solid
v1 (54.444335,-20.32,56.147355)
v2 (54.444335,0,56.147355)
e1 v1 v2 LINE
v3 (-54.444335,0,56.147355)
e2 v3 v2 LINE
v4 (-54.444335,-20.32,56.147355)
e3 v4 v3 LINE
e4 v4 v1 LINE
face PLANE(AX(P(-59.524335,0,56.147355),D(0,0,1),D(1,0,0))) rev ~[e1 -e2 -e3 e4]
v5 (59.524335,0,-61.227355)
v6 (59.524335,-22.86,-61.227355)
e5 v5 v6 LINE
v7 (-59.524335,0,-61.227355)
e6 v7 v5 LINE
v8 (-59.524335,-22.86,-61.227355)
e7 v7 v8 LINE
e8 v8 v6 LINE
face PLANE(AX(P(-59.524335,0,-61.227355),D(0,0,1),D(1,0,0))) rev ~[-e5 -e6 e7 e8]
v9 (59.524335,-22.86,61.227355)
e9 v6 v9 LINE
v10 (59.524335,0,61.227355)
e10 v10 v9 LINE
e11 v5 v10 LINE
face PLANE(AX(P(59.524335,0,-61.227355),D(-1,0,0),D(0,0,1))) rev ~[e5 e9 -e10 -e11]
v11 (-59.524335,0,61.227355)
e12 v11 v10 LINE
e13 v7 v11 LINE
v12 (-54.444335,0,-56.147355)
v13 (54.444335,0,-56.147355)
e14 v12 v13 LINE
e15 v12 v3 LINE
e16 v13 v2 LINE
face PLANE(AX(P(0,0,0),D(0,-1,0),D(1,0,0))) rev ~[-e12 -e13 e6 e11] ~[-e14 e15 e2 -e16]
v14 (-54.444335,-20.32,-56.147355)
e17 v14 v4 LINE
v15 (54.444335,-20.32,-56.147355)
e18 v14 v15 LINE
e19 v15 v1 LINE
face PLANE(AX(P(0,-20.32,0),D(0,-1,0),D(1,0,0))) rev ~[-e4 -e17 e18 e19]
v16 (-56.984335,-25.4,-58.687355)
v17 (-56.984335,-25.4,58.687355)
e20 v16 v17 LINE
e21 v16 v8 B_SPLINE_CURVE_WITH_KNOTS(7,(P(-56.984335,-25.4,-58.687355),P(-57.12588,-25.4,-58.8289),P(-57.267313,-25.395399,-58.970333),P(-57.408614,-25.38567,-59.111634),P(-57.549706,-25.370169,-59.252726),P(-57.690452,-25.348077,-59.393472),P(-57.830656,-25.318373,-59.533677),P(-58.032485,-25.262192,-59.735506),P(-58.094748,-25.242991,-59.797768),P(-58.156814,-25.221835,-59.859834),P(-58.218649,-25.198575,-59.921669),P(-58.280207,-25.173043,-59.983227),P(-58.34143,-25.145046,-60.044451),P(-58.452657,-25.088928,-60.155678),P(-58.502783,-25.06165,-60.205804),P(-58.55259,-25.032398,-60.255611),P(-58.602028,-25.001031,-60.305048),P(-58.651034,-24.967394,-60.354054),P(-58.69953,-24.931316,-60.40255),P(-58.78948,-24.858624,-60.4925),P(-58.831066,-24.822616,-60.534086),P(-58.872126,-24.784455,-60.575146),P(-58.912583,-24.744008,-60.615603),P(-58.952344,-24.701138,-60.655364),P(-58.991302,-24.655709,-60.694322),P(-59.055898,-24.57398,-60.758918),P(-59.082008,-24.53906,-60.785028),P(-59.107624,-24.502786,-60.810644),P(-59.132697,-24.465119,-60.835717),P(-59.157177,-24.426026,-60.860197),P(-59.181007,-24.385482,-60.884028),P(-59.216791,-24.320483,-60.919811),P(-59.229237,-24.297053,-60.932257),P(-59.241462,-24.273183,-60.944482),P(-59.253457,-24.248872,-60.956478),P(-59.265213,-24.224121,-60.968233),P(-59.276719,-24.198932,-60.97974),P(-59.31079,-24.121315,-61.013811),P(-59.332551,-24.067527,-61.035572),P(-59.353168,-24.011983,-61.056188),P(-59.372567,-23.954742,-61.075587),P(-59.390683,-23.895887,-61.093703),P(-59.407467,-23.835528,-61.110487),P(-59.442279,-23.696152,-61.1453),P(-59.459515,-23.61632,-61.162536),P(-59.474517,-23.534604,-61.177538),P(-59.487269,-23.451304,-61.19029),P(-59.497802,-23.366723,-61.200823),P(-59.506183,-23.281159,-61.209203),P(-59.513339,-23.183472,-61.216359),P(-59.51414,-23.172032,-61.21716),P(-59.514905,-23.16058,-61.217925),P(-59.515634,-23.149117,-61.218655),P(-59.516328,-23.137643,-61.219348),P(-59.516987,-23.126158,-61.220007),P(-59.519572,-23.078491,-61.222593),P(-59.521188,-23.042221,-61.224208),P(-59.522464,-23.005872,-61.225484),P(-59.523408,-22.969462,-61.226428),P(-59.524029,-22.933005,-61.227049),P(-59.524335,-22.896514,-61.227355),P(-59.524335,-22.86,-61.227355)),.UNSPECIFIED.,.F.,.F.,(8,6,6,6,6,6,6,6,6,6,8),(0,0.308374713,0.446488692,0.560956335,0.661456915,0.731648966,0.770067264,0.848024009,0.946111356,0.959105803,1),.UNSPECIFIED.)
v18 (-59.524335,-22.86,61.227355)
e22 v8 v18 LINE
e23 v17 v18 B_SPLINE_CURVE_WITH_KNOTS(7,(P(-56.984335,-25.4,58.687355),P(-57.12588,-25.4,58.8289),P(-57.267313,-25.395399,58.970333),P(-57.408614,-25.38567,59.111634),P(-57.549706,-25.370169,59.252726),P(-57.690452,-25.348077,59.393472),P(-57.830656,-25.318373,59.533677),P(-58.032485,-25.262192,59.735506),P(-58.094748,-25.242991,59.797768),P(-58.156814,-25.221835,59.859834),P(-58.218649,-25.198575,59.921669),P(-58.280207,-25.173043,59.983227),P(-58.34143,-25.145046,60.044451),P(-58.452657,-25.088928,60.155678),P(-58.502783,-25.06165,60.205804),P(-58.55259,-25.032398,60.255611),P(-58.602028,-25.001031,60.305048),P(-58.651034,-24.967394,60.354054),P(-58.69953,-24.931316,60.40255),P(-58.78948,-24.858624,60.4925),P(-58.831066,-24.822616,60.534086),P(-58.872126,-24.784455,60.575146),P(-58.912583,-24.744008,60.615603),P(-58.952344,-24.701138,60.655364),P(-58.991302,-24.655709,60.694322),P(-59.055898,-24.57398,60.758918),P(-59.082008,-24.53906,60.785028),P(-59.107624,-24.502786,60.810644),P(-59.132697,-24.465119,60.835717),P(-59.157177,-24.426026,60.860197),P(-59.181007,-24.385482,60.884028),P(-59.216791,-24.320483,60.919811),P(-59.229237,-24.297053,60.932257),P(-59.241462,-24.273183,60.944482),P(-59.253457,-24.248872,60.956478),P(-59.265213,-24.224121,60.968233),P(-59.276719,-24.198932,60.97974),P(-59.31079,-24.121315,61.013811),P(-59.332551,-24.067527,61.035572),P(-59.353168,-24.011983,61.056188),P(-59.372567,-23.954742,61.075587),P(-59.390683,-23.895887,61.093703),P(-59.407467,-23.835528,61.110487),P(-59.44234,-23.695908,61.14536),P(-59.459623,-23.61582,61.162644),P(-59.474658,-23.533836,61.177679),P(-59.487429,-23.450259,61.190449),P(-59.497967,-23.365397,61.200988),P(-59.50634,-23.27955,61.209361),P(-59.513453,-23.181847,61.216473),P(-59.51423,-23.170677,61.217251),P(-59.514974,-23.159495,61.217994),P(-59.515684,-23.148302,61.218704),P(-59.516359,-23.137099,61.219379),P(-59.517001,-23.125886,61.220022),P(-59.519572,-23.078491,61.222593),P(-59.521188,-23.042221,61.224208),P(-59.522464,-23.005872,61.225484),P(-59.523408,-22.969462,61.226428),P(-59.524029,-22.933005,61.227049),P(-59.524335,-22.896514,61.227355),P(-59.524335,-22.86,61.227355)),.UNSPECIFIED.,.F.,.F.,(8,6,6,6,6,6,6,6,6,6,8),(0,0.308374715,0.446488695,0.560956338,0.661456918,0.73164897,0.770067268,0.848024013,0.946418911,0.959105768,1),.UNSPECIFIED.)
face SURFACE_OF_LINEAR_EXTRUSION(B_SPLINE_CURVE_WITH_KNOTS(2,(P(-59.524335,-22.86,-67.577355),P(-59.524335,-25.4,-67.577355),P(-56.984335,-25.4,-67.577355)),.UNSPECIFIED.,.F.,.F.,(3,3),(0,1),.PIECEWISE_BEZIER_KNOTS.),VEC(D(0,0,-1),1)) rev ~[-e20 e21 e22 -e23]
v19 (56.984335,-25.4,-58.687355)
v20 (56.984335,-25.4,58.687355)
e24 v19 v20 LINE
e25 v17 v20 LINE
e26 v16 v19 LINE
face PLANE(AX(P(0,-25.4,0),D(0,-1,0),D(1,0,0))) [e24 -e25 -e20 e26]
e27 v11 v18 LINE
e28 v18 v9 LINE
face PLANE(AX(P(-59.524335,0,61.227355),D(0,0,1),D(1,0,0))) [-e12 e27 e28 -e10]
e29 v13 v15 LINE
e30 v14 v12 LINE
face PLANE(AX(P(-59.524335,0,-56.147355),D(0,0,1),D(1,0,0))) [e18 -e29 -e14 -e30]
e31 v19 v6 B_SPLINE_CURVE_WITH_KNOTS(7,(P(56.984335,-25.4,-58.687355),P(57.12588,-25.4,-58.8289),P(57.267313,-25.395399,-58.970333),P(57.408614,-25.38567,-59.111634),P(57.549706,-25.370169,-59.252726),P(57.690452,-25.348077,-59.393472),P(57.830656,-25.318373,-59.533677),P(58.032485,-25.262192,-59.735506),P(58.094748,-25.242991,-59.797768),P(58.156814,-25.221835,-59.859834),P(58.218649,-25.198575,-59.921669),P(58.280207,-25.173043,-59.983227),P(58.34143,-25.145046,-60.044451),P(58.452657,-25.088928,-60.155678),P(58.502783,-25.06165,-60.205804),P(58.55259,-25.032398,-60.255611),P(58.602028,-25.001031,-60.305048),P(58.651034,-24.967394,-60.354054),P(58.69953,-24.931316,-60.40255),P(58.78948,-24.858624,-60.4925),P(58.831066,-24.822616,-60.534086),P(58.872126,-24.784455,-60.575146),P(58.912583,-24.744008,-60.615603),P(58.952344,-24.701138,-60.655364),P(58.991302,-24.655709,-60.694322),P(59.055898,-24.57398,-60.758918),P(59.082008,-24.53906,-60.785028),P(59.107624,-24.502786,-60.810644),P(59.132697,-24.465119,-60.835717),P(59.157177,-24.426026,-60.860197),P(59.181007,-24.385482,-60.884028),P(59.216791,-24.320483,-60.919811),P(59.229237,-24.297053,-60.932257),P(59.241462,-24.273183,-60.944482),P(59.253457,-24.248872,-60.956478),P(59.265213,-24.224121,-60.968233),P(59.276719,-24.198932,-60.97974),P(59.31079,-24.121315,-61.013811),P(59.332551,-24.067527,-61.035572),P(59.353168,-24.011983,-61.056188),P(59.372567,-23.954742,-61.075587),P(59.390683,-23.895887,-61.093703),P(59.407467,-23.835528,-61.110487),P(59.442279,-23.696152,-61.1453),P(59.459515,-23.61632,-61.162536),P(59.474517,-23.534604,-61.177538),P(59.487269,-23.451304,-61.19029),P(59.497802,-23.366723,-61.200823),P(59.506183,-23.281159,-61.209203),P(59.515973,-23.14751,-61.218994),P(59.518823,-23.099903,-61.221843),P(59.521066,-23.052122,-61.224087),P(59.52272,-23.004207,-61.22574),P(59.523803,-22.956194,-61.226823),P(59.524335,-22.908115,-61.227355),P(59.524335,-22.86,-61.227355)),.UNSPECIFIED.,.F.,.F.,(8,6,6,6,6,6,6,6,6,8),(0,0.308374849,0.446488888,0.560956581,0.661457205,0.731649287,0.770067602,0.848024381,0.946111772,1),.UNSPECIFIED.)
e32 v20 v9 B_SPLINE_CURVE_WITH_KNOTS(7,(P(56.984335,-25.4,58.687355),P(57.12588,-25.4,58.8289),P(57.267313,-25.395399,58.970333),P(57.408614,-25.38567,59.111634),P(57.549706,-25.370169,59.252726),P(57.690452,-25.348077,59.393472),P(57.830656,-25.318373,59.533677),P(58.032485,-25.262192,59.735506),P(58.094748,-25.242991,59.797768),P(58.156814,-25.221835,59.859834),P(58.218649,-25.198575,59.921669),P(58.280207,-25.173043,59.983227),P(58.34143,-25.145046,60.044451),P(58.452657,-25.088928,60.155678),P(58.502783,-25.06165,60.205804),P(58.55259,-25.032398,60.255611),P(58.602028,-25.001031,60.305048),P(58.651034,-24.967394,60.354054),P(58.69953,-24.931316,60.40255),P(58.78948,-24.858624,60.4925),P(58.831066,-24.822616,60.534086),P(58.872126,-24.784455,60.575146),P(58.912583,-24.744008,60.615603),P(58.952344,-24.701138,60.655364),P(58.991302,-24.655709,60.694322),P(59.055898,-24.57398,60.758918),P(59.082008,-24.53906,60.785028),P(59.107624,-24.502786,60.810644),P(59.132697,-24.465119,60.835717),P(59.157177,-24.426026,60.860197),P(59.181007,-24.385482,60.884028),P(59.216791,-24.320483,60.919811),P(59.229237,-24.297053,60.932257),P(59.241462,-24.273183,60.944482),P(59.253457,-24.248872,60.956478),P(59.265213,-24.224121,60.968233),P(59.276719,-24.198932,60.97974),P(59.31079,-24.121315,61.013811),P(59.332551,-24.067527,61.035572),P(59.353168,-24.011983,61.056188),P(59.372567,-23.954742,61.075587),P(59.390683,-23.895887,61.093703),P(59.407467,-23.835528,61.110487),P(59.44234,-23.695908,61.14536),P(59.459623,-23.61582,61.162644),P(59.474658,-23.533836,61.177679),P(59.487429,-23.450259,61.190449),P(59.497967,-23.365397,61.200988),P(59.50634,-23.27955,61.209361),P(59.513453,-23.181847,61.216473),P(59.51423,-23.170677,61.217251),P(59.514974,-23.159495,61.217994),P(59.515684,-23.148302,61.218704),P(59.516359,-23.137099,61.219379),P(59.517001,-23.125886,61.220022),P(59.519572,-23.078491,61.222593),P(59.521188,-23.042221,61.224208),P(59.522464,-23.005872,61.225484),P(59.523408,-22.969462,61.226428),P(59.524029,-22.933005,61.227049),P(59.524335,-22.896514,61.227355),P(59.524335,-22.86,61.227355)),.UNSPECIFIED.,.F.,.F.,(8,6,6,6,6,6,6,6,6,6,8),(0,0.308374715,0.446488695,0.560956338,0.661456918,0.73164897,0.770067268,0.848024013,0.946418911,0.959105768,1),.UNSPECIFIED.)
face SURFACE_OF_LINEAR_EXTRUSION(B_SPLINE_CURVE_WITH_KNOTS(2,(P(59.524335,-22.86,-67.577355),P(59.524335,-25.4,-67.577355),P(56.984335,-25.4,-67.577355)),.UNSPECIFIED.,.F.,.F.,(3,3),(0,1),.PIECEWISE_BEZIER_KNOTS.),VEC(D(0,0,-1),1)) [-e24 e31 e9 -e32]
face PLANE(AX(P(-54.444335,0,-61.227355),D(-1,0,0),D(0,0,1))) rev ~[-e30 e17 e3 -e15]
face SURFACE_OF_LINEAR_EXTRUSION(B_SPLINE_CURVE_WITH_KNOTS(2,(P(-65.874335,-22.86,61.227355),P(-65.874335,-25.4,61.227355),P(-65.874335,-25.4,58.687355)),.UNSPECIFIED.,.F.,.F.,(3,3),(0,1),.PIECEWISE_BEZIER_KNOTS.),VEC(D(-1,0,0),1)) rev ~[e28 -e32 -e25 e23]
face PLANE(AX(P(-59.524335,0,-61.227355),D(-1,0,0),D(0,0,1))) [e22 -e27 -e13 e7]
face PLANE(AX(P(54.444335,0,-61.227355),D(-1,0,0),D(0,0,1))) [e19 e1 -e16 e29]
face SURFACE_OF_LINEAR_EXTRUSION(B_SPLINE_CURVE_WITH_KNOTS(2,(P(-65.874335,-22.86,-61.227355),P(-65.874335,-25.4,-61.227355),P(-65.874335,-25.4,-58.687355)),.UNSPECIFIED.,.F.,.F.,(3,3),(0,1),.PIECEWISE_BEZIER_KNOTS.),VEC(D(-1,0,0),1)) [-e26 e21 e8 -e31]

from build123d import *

# Parameters (mm, degrees)
F0_W        = 119.0486699343
F0_H        = 122.4547103047
F1_DEPTH    = 25.4
F2_T1_DEPTH = 131.7486699343
F2_T3_DEPTH = 135.1547103047
F3_T        = -5.08


# Not quite as in the source:
# - a fillet or chamfer that OpenCascade refuses, or shapes differently, is made with other operations: its cross-section is extruded or revolved along the edge and cut away or added


with BuildPart() as f1:
    # F0 (on Front) → F1 (new body)
    with BuildSketch(Plane.XZ):
        Rectangle(F0_W, F0_H)
    extrude(amount=F1_DEPTH)

    # F2: fillet of radius 2.54 on 4 edges, made by hand

    # F2_s2 → F2_t1 (cut)
    with BuildSketch(Plane.YZ.offset(-65.8743349671)):
        with BuildLine():
            add(Edge.make_bspline(
                [(-22.86, 61.2273551524), (-25.4, 61.2273551524), (-25.4, 58.6873551524)],
                knots=[0, 0, 0, 1, 1, 1], degree=2, weights=[1, 1, 1]))
            Line((-25.4, 58.6873551524), (-25.4, 61.2273551524))
            Line((-25.4, 61.2273551524), (-22.86, 61.2273551524))
        make_face()
        with BuildLine():
            add(Edge.make_bspline(
                [(-22.86, -61.2273551524), (-25.4, -61.2273551524), (-25.4, -58.6873551524)],
                knots=[0, 0, 0, 1, 1, 1], degree=2, weights=[1, 1, 1]))
            Line((-25.4, -58.6873551524), (-25.4, -61.2273551524))
            Line((-25.4, -61.2273551524), (-22.86, -61.2273551524))
        make_face()
    extrude(amount=F2_T1_DEPTH, mode=Mode.SUBTRACT)

    # F2_s4 → F2_t3 (cut)
    with BuildSketch(Plane.XY.offset(-67.5773551524)):
        with BuildLine():
            add(Edge.make_bspline(
                [(-59.5243349671, -22.86), (-59.5243349671, -25.4), (-56.9843349671, -25.4)],
                knots=[0, 0, 0, 1, 1, 1], degree=2, weights=[1, 1, 1]))
            Line((-56.9843349671, -25.4), (-59.5243349671, -25.4))
            Line((-59.5243349671, -25.4), (-59.5243349671, -22.86))
        make_face()
        with BuildLine():
            add(Edge.make_bspline(
                [(59.5243349671, -22.86), (59.5243349671, -25.4), (56.9843349671, -25.4)],
                knots=[0, 0, 0, 1, 1, 1], degree=2, weights=[1, 1, 1]))
            Line((56.9843349671, -25.4), (59.5243349671, -25.4))
            Line((59.5243349671, -25.4), (59.5243349671, -22.86))
        make_face()
    extrude(amount=F2_T3_DEPTH, mode=Mode.SUBTRACT)

    # F3
    f3_openings = [f1.faces().sort_by_distance(p)[0] for p in [
        (0, 0, 0),
    ]]
    offset(amount=F3_T, openings=f3_openings)


solid = f1.part
